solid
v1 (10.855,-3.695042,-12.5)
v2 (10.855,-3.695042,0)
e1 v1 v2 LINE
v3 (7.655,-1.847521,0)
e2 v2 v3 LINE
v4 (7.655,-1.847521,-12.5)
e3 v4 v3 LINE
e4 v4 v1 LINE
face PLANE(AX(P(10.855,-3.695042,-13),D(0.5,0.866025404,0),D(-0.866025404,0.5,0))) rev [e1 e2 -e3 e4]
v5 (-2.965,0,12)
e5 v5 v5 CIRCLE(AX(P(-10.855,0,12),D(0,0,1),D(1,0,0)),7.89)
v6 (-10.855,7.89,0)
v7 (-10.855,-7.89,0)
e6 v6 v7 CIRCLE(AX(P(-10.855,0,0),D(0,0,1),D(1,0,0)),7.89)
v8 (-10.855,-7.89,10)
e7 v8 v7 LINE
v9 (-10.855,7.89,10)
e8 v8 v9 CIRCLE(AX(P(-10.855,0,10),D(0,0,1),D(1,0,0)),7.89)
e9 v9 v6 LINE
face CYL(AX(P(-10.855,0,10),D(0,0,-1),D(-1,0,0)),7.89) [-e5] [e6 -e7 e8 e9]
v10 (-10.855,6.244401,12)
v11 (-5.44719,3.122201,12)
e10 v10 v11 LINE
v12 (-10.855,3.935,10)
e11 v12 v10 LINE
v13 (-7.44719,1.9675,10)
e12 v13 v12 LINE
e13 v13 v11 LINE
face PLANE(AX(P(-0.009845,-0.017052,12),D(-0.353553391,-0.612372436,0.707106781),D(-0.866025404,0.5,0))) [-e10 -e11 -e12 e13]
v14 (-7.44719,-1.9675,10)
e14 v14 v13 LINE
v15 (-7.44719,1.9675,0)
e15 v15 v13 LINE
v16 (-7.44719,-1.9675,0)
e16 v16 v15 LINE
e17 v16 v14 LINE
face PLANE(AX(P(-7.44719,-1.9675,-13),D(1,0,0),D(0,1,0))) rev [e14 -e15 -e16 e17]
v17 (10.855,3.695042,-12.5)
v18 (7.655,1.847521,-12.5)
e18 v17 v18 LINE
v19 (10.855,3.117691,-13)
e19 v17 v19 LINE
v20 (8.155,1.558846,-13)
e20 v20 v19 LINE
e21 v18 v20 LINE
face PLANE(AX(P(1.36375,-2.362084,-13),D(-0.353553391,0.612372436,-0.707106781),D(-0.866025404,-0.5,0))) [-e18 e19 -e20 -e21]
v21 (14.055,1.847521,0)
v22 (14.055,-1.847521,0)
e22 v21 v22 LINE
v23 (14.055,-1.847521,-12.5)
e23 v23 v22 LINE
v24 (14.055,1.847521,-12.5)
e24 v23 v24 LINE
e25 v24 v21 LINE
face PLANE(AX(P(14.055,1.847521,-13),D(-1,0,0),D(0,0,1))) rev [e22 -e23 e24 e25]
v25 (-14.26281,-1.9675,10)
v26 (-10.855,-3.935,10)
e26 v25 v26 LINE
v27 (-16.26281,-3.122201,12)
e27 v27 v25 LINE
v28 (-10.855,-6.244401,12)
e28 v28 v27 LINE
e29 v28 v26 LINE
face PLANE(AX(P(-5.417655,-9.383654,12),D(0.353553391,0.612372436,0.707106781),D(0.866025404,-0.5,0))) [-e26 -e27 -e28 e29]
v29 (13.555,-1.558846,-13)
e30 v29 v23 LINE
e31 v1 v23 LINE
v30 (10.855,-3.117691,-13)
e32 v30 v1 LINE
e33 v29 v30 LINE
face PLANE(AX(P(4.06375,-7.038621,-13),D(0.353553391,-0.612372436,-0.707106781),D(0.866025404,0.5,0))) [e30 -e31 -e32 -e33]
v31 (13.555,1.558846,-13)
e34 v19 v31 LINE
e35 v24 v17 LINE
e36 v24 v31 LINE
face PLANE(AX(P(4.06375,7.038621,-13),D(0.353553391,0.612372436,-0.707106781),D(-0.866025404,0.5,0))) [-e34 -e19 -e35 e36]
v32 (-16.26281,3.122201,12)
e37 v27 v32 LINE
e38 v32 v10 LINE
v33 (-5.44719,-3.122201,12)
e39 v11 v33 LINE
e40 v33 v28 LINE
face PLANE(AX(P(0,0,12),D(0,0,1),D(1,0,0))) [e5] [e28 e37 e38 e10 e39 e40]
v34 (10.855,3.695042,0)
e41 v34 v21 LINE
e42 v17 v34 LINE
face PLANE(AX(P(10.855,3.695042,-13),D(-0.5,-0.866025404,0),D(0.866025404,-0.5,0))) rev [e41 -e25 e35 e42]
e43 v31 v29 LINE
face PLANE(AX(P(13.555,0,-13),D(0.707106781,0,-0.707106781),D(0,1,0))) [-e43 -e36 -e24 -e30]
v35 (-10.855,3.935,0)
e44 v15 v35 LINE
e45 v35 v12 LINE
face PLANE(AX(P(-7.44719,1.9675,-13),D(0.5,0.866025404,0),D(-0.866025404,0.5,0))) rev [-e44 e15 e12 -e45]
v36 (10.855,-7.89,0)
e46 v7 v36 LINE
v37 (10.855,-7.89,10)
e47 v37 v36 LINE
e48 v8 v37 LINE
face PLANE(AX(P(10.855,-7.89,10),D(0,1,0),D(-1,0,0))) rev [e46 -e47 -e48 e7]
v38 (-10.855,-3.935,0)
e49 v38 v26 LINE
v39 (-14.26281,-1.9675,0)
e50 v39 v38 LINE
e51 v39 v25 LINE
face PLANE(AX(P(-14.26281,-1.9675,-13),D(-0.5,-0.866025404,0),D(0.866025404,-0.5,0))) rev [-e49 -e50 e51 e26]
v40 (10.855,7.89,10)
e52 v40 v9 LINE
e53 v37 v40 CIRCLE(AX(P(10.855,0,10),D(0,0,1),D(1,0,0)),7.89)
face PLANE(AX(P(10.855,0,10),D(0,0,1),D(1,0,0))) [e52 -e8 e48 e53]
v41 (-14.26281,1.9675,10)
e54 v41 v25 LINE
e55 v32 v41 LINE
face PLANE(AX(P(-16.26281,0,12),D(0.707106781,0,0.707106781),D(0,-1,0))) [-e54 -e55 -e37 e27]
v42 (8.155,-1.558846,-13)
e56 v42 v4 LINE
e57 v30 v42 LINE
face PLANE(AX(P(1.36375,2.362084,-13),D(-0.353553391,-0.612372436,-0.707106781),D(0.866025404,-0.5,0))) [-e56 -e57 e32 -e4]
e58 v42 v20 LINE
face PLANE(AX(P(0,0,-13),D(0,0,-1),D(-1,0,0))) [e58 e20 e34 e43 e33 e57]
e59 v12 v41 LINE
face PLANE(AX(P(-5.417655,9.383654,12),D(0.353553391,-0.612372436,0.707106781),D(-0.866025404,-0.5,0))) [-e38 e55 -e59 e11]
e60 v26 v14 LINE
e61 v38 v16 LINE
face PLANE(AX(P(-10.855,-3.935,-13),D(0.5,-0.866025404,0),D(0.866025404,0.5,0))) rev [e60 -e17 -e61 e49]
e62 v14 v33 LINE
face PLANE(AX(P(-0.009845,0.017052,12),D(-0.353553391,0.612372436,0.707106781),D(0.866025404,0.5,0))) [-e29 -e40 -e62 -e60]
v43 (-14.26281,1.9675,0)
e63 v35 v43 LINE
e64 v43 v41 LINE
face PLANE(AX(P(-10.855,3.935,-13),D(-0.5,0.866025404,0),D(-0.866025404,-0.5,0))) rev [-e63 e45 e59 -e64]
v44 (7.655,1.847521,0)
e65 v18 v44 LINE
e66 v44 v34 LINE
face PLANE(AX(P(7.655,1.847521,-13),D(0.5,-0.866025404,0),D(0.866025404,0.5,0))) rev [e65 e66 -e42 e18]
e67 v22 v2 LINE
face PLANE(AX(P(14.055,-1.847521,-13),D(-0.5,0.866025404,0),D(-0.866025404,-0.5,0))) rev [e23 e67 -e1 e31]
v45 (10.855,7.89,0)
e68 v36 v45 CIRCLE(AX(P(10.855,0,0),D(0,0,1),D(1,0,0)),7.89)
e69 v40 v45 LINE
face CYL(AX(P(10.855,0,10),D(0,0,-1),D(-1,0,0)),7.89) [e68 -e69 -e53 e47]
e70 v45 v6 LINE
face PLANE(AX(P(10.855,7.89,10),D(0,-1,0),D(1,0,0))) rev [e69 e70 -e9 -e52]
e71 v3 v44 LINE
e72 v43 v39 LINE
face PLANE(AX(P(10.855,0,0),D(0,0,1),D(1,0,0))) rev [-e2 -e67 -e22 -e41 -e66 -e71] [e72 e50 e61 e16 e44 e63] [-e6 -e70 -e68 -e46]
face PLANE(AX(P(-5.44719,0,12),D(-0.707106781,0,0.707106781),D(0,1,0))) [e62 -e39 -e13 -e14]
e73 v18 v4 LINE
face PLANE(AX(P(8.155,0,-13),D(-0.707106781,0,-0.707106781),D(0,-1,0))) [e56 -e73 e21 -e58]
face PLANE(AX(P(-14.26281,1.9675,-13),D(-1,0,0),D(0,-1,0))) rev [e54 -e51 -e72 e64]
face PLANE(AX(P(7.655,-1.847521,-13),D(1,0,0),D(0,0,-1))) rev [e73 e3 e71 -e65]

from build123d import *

# Parameters (mm, degrees)
BOSS_EXTRU_1_DEPTH      = 10
BOSS_EXTRU_3_DEPTH      = 13
ENL_V_MAT_EXTRU_1_DEPTH = 31.702233225
BOSS_EXTRU_4_DEPTH      = 2
CHANFREIN1_SIZE         = 2
CHANFREIN2_SIZE         = 0.5


with BuildPart() as part:
    # Esquisse1 → Boss.-Extru.1 (new body)
    with BuildSketch(Plane(origin=(0, 0, 0), x_dir=(0, 1, 0), z_dir=(0, 0, 1))):
        with BuildLine():
            Line((-7.89, -10.855), (-7.89, 10.855))
            ThreePointArc((-7.89, 10.855), (0, 18.745), (7.89, 10.855))
            Line((7.89, 10.855), (7.89, -10.855))
            ThreePointArc((7.89, -10.855), (0, -18.745), (-7.89, -10.855))
        make_face()
    extrude(amount=BOSS_EXTRU_1_DEPTH)

    # Esquisse3 → Boss.-Extru.3 (add)
    with BuildSketch(Plane(origin=(0, 0, 0), x_dir=(1, 0, 0), z_dir=(0, 0, -1))):
        Polygon((10.855, -3.695041723), (14.055, -1.847520861), (14.055, 1.847520861), (10.855, 3.695041723), (7.655, 1.847520861), (7.655, -1.847520861), align=None)
    extrude(amount=BOSS_EXTRU_3_DEPTH)

    # Esquisse2 → Enlèv. mat.-Extru.1 (cut, through all)
    with BuildSketch(Plane.XY.offset(10)):
        Polygon((-10.855, 3.935), (-14.262809964, 1.9675), (-14.262809964, -1.9675), (-10.855, -3.935), (-7.447190036, -1.9675), (-7.447190036, 1.9675), align=None)
    extrude(amount=-ENL_V_MAT_EXTRU_1_DEPTH, mode=Mode.SUBTRACT)

    # Esquisse4 → Boss.-Extru.4 (add)
    with BuildSketch(Plane.XY.offset(10)):
        with BuildLine():
            ThreePointArc((-10.855, -7.89), (-5.275927496, -5.579072504), (-2.965, 0))
            ThreePointArc((-2.965, 0), (-5.275927496, 5.579072504), (-10.855, 7.89))
            ThreePointArc((-10.855, 7.89), (-18.745, 0), (-10.855, -7.89))
        make_face()
        Polygon((-10.855, 3.935), (-7.447190036, 1.9675), (-7.447190036, -1.9675), (-10.855, -3.935), (-14.262809964, -1.9675), (-14.262809964, 1.9675), align=None, mode=Mode.SUBTRACT)
    extrude(amount=BOSS_EXTRU_4_DEPTH)

    # Chanfrein1
    chanfrein1_edges = [part.edges().sort_by_distance(p)[0] for p in [
        (-9.151095018, 2.95125, 12),
        (-7.447190036, 0, 12),
        (-9.151095018, -2.95125, 12),
        (-12.558904982, -2.95125, 12),
        (-14.262809964, 0, 12),
        (-12.558904982, 2.95125, 12),
    ]]
    chamfer(chanfrein1_edges, length=CHANFREIN1_SIZE - 0.0001)  # a hair under: the kernel refuses the full size

    # Chanfrein2
    chanfrein2_edges = [part.edges().sort_by_distance(p)[0] for p in [
        (9.255, 2.771281292, -13),
        (12.455, 2.771281292, -13),
        (14.055, 0, -13),
        (12.455, -2.771281292, -13),
        (9.255, -2.771281292, -13),
        (7.655, 0, -13),
    ]]
    chamfer(chanfrein2_edges, length=CHANFREIN2_SIZE)


solid = part.part
